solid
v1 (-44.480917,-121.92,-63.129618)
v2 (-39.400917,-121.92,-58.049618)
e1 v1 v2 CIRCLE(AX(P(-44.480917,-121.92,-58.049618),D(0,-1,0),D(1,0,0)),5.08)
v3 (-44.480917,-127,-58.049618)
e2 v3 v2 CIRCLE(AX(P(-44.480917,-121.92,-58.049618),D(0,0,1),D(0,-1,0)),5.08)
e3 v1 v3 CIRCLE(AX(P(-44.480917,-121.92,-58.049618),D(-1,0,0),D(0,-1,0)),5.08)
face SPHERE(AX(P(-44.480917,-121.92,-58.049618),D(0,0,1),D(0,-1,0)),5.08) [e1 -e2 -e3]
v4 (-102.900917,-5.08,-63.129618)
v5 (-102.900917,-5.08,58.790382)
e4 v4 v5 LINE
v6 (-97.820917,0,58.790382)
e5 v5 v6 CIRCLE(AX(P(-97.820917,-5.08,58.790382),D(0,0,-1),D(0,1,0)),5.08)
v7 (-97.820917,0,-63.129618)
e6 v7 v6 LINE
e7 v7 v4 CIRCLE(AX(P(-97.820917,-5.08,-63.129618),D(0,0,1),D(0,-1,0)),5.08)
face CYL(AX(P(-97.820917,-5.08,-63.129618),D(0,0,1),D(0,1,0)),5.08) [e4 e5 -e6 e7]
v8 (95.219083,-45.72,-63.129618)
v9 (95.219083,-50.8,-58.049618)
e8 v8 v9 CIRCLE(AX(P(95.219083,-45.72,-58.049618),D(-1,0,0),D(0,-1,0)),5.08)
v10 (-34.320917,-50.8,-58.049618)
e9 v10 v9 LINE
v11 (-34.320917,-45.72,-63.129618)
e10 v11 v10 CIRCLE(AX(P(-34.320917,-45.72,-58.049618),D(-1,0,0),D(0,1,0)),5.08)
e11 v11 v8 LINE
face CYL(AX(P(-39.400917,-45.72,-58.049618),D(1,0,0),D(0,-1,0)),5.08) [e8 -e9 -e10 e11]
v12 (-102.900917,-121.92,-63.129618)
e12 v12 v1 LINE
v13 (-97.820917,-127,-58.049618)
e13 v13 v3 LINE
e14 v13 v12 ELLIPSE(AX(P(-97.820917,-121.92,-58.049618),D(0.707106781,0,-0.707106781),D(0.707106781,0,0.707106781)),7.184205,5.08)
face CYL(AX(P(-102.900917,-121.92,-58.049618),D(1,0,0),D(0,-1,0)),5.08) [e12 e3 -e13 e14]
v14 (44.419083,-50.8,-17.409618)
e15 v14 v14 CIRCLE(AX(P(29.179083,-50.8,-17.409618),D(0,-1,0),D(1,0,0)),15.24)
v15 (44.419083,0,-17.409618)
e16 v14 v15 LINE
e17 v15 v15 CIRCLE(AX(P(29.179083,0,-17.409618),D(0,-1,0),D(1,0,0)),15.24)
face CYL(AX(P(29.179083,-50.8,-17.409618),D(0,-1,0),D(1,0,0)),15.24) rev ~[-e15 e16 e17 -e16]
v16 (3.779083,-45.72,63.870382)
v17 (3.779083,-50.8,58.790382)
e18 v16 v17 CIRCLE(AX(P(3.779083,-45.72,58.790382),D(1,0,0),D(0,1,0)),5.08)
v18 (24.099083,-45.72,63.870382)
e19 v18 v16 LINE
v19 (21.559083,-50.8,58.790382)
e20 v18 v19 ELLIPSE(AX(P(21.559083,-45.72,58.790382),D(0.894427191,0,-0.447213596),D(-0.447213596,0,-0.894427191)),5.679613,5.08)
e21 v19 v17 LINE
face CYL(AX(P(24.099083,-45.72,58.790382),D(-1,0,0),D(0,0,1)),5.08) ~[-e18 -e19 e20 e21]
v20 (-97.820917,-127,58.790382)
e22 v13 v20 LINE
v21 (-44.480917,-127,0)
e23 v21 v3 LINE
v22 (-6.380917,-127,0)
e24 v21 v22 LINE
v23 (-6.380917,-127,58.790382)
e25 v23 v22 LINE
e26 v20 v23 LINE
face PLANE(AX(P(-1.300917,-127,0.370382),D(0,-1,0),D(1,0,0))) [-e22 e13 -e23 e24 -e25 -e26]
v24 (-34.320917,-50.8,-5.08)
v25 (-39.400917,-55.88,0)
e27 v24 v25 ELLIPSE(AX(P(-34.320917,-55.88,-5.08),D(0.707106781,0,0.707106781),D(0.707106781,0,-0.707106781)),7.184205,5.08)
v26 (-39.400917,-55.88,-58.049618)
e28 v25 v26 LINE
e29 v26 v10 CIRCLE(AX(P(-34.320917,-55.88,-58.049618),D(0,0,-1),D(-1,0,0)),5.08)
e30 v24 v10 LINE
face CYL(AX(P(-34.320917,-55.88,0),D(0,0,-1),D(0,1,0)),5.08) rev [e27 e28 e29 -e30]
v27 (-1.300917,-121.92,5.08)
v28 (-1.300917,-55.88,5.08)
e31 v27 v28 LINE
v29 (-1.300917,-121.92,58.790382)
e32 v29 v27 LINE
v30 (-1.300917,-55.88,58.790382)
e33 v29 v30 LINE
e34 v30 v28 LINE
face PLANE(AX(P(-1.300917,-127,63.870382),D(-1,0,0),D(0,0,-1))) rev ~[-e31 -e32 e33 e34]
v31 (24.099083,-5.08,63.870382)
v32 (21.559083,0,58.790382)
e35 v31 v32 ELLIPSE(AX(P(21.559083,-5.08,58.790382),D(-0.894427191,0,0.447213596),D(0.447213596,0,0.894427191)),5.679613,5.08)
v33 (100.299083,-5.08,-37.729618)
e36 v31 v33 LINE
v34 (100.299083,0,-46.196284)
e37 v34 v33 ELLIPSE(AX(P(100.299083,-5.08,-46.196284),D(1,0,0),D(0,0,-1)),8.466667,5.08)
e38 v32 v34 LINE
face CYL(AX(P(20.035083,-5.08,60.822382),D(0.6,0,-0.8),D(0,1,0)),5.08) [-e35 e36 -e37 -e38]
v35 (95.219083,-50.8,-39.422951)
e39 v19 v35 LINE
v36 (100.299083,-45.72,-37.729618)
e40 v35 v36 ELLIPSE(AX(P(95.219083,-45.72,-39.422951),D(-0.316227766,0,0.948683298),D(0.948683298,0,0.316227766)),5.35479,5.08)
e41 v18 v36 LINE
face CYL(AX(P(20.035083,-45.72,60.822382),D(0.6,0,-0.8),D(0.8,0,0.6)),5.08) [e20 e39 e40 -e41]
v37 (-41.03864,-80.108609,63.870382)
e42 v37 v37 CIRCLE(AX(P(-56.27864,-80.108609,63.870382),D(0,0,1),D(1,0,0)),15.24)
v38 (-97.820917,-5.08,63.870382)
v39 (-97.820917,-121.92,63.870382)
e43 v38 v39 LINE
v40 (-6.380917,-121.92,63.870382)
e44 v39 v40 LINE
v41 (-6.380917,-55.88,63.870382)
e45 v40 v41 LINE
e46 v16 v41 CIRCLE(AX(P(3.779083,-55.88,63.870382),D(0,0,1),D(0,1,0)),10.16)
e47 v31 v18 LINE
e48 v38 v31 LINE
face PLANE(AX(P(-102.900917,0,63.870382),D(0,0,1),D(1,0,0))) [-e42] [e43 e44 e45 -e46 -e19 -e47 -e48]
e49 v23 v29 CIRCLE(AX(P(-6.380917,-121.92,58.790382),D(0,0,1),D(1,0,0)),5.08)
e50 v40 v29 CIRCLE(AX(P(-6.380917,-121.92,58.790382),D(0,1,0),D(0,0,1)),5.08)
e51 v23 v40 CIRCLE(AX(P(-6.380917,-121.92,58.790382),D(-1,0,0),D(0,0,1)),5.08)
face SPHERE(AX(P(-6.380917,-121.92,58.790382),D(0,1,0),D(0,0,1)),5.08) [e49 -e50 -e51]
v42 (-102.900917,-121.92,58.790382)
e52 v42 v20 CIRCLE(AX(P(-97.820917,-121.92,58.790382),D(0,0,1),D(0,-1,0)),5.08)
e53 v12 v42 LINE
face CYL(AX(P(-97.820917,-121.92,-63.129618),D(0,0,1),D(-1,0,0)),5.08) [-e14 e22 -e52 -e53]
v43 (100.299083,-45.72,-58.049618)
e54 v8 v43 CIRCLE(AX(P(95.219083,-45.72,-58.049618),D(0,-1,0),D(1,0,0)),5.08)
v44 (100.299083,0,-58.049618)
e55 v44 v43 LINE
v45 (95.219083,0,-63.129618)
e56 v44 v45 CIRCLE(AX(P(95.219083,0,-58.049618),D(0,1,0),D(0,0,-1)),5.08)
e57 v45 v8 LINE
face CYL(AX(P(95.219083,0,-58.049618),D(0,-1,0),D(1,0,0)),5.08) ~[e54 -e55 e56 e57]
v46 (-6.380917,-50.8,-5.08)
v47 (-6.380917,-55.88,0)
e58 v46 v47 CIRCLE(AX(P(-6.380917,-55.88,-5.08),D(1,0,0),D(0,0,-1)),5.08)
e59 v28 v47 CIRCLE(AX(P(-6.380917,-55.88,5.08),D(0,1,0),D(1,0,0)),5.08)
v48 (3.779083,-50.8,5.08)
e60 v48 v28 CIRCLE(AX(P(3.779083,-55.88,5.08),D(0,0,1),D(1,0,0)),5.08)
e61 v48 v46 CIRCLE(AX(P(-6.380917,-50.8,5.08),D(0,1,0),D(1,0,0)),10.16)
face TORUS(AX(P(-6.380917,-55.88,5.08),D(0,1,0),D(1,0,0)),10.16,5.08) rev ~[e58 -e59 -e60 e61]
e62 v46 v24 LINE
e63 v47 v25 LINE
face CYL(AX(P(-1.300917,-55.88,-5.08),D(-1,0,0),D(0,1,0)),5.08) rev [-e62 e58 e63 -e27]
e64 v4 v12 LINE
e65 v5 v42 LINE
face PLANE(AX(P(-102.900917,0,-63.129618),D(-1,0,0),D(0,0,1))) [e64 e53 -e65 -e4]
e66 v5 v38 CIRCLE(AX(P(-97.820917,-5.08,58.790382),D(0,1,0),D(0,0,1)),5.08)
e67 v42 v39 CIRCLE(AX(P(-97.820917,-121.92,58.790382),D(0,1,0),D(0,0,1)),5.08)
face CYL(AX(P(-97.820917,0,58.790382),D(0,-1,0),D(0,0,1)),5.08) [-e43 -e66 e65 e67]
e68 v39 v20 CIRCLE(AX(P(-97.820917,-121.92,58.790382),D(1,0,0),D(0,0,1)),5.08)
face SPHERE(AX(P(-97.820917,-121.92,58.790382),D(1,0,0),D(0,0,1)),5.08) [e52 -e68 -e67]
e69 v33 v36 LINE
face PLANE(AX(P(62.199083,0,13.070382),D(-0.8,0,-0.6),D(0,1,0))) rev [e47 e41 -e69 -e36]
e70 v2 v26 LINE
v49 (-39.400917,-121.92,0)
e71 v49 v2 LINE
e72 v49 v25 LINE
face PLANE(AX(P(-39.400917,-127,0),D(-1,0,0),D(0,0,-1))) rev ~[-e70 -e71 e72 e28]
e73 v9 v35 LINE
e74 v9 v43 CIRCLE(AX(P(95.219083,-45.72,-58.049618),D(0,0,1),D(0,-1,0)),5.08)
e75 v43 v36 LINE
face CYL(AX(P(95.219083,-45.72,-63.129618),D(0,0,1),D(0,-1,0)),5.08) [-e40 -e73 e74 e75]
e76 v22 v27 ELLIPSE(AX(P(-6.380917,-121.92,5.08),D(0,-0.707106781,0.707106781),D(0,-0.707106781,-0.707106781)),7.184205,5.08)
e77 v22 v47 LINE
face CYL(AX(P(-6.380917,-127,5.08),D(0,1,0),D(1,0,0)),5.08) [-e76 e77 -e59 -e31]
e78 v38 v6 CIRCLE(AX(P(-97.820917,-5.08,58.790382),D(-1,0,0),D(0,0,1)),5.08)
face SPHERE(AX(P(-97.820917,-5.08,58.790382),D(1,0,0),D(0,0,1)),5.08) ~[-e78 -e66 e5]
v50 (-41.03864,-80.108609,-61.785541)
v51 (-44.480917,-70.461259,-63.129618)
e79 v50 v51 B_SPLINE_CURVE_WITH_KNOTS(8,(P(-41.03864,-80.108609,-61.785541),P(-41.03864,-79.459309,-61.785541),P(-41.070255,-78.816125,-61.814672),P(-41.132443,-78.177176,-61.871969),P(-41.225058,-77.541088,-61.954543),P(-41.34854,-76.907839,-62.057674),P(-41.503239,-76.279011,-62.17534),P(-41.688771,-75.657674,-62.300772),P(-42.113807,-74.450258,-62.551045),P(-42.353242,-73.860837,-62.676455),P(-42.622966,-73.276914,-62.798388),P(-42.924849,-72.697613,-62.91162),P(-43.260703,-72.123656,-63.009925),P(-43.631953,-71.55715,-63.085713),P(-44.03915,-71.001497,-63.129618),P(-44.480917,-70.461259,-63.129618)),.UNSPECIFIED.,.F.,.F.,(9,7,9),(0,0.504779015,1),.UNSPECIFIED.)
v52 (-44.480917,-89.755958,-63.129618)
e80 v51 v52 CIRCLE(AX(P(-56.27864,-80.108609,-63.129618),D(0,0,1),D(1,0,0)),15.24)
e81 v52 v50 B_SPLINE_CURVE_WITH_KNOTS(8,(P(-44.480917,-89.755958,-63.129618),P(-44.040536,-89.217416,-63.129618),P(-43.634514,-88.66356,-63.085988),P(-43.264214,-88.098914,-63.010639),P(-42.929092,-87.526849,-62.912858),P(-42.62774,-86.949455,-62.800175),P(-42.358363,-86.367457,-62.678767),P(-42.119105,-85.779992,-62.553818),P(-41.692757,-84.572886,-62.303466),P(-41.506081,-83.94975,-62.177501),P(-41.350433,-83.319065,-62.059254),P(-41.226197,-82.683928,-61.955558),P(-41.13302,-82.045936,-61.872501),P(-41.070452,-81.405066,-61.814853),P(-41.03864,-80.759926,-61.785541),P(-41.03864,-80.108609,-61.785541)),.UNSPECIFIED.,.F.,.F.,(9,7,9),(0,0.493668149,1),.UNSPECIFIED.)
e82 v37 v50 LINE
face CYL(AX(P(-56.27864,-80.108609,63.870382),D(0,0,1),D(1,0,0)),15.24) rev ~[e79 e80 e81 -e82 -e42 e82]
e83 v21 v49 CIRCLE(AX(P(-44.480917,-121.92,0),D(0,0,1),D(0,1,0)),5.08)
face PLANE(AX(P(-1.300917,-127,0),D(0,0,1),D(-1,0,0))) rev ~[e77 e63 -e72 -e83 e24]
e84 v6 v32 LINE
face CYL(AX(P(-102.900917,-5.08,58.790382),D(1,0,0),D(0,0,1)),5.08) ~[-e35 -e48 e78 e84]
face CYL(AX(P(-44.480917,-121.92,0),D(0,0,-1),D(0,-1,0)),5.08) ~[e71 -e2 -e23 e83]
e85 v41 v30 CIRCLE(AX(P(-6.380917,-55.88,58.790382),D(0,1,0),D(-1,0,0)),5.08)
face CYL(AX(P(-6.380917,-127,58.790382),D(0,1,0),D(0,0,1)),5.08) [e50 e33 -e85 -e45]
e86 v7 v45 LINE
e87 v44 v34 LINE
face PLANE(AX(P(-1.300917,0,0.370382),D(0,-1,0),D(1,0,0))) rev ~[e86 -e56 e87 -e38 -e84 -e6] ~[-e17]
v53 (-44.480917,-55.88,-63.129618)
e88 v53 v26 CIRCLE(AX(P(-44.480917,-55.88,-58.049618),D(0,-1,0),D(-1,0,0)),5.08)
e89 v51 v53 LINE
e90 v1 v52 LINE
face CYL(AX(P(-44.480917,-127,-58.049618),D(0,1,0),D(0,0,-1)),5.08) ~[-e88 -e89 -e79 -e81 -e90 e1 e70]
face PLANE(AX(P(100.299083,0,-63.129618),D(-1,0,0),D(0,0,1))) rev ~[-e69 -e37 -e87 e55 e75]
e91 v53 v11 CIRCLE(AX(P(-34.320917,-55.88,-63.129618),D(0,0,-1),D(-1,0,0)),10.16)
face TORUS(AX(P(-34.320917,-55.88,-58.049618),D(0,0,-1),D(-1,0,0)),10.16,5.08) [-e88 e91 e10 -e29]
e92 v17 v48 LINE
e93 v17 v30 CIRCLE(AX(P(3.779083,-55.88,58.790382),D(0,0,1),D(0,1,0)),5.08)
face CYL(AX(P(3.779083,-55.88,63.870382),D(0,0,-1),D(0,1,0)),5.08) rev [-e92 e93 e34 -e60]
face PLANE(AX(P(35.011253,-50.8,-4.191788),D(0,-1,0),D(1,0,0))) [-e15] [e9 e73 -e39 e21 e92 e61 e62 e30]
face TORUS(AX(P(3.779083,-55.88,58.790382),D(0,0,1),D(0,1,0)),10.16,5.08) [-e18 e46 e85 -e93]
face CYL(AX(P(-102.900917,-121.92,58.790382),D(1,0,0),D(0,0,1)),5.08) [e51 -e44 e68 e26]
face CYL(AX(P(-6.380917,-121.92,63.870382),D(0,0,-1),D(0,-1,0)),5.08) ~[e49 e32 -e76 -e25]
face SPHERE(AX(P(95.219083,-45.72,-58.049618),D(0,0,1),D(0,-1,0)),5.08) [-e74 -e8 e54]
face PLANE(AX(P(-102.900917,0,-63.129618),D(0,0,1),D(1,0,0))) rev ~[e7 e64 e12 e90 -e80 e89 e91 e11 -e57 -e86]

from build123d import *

# Parameters (mm, degrees)
F0_W     = 203.2
F0_H     = 127
F1_DEPTH = 127
F3_DEPTH = 76.2
F4_SIZE2 = 101.6
F4_SIZE  = 76.2
F5_R     = 5.08
F6_R     = 15.24
F7_DEPTH = 50.8
F8_R     = 15.24
F9_DEPTH = 127


with BuildPart() as f1:
    # F0 (on Front) → F1 (new body)
    with BuildSketch(Plane.XZ):
        with Locations((-1.3009174736, 0.3703823313)):
            Rectangle(F0_W, F0_H)
    extrude(amount=F1_DEPTH)

    # F2 (on face) → F3 (cut)
    with BuildSketch(Plane.XZ.offset(127)):
        Polygon((-39.4009174736, 0), (-39.4009174736, -63.1296176687), (100.2990825264, -63.1296176687), (100.2990825264, 63.8703823313), (-1.3009174736, 63.8703823313), (-1.3009174736, 0), align=None)
    extrude(amount=-F3_DEPTH, mode=Mode.SUBTRACT)

    # F4
    f4_edges = [f1.edges().sort_by_distance(p)[0] for p in [
        (100.299083, -25.4, 63.870382),
    ]]
    f4_side = f1.faces().sort_by_distance((-23.072346, -52.614286, 63.870382))[0]
    chamfer(f4_edges, length=F4_SIZE, length2=F4_SIZE2, reference=f4_side)

    # F5
    f5_edges = [f1.edges().sort_by_distance(p)[0] for p in [
        (11.399083, -50.8, 63.870382),
        (-1.300917, -88.9, 63.870382),
        (-52.100917, -127, 63.870382),
        (100.299083, -50.8, -50.429618),
        (62.199083, -50.8, 13.070382),
        (30.449083, -50.8, -63.129618),
        (-39.400917, -50.8, -31.564809),
        (-1.300917, -50.8, 31.935191),
        (-20.350917, -50.8, 0),
        (-1.300917, -127, 31.935191),
        (-1.300917, -88.9, 0),
        (-39.400917, -127, -31.564809),
        (100.299083, -25.4, -63.129618),
        (-71.150917, -127, -63.129618),
        (-39.400917, 0, 63.870382),
        (62.199083, 0, 13.070382),
        (-102.900917, -63.5, 63.870382),
        (-102.900917, -127, 0.370382),
        (-102.900917, 0, 0.370382),
        (-39.400917, -88.9, -63.129618),
    ]]
    fillet(f5_edges, radius=F5_R)

    # F6 (on face) → F7 (cut, through all)
    with BuildSketch(Plane.XZ.offset(50.8)):
        with Locations((29.1790825264, -17.4096176687)):
            Circle(F6_R)
    extrude(amount=-F7_DEPTH, mode=Mode.SUBTRACT)

    # F8 (on face) → F9 (cut, through all)
    with BuildSketch(Plane.XY.offset(63.8703823313)):
        with Locations((-56.2786398957, -80.1086086328)):
            Circle(F8_R)
    extrude(amount=-F9_DEPTH, mode=Mode.SUBTRACT)


solid = f1.part
